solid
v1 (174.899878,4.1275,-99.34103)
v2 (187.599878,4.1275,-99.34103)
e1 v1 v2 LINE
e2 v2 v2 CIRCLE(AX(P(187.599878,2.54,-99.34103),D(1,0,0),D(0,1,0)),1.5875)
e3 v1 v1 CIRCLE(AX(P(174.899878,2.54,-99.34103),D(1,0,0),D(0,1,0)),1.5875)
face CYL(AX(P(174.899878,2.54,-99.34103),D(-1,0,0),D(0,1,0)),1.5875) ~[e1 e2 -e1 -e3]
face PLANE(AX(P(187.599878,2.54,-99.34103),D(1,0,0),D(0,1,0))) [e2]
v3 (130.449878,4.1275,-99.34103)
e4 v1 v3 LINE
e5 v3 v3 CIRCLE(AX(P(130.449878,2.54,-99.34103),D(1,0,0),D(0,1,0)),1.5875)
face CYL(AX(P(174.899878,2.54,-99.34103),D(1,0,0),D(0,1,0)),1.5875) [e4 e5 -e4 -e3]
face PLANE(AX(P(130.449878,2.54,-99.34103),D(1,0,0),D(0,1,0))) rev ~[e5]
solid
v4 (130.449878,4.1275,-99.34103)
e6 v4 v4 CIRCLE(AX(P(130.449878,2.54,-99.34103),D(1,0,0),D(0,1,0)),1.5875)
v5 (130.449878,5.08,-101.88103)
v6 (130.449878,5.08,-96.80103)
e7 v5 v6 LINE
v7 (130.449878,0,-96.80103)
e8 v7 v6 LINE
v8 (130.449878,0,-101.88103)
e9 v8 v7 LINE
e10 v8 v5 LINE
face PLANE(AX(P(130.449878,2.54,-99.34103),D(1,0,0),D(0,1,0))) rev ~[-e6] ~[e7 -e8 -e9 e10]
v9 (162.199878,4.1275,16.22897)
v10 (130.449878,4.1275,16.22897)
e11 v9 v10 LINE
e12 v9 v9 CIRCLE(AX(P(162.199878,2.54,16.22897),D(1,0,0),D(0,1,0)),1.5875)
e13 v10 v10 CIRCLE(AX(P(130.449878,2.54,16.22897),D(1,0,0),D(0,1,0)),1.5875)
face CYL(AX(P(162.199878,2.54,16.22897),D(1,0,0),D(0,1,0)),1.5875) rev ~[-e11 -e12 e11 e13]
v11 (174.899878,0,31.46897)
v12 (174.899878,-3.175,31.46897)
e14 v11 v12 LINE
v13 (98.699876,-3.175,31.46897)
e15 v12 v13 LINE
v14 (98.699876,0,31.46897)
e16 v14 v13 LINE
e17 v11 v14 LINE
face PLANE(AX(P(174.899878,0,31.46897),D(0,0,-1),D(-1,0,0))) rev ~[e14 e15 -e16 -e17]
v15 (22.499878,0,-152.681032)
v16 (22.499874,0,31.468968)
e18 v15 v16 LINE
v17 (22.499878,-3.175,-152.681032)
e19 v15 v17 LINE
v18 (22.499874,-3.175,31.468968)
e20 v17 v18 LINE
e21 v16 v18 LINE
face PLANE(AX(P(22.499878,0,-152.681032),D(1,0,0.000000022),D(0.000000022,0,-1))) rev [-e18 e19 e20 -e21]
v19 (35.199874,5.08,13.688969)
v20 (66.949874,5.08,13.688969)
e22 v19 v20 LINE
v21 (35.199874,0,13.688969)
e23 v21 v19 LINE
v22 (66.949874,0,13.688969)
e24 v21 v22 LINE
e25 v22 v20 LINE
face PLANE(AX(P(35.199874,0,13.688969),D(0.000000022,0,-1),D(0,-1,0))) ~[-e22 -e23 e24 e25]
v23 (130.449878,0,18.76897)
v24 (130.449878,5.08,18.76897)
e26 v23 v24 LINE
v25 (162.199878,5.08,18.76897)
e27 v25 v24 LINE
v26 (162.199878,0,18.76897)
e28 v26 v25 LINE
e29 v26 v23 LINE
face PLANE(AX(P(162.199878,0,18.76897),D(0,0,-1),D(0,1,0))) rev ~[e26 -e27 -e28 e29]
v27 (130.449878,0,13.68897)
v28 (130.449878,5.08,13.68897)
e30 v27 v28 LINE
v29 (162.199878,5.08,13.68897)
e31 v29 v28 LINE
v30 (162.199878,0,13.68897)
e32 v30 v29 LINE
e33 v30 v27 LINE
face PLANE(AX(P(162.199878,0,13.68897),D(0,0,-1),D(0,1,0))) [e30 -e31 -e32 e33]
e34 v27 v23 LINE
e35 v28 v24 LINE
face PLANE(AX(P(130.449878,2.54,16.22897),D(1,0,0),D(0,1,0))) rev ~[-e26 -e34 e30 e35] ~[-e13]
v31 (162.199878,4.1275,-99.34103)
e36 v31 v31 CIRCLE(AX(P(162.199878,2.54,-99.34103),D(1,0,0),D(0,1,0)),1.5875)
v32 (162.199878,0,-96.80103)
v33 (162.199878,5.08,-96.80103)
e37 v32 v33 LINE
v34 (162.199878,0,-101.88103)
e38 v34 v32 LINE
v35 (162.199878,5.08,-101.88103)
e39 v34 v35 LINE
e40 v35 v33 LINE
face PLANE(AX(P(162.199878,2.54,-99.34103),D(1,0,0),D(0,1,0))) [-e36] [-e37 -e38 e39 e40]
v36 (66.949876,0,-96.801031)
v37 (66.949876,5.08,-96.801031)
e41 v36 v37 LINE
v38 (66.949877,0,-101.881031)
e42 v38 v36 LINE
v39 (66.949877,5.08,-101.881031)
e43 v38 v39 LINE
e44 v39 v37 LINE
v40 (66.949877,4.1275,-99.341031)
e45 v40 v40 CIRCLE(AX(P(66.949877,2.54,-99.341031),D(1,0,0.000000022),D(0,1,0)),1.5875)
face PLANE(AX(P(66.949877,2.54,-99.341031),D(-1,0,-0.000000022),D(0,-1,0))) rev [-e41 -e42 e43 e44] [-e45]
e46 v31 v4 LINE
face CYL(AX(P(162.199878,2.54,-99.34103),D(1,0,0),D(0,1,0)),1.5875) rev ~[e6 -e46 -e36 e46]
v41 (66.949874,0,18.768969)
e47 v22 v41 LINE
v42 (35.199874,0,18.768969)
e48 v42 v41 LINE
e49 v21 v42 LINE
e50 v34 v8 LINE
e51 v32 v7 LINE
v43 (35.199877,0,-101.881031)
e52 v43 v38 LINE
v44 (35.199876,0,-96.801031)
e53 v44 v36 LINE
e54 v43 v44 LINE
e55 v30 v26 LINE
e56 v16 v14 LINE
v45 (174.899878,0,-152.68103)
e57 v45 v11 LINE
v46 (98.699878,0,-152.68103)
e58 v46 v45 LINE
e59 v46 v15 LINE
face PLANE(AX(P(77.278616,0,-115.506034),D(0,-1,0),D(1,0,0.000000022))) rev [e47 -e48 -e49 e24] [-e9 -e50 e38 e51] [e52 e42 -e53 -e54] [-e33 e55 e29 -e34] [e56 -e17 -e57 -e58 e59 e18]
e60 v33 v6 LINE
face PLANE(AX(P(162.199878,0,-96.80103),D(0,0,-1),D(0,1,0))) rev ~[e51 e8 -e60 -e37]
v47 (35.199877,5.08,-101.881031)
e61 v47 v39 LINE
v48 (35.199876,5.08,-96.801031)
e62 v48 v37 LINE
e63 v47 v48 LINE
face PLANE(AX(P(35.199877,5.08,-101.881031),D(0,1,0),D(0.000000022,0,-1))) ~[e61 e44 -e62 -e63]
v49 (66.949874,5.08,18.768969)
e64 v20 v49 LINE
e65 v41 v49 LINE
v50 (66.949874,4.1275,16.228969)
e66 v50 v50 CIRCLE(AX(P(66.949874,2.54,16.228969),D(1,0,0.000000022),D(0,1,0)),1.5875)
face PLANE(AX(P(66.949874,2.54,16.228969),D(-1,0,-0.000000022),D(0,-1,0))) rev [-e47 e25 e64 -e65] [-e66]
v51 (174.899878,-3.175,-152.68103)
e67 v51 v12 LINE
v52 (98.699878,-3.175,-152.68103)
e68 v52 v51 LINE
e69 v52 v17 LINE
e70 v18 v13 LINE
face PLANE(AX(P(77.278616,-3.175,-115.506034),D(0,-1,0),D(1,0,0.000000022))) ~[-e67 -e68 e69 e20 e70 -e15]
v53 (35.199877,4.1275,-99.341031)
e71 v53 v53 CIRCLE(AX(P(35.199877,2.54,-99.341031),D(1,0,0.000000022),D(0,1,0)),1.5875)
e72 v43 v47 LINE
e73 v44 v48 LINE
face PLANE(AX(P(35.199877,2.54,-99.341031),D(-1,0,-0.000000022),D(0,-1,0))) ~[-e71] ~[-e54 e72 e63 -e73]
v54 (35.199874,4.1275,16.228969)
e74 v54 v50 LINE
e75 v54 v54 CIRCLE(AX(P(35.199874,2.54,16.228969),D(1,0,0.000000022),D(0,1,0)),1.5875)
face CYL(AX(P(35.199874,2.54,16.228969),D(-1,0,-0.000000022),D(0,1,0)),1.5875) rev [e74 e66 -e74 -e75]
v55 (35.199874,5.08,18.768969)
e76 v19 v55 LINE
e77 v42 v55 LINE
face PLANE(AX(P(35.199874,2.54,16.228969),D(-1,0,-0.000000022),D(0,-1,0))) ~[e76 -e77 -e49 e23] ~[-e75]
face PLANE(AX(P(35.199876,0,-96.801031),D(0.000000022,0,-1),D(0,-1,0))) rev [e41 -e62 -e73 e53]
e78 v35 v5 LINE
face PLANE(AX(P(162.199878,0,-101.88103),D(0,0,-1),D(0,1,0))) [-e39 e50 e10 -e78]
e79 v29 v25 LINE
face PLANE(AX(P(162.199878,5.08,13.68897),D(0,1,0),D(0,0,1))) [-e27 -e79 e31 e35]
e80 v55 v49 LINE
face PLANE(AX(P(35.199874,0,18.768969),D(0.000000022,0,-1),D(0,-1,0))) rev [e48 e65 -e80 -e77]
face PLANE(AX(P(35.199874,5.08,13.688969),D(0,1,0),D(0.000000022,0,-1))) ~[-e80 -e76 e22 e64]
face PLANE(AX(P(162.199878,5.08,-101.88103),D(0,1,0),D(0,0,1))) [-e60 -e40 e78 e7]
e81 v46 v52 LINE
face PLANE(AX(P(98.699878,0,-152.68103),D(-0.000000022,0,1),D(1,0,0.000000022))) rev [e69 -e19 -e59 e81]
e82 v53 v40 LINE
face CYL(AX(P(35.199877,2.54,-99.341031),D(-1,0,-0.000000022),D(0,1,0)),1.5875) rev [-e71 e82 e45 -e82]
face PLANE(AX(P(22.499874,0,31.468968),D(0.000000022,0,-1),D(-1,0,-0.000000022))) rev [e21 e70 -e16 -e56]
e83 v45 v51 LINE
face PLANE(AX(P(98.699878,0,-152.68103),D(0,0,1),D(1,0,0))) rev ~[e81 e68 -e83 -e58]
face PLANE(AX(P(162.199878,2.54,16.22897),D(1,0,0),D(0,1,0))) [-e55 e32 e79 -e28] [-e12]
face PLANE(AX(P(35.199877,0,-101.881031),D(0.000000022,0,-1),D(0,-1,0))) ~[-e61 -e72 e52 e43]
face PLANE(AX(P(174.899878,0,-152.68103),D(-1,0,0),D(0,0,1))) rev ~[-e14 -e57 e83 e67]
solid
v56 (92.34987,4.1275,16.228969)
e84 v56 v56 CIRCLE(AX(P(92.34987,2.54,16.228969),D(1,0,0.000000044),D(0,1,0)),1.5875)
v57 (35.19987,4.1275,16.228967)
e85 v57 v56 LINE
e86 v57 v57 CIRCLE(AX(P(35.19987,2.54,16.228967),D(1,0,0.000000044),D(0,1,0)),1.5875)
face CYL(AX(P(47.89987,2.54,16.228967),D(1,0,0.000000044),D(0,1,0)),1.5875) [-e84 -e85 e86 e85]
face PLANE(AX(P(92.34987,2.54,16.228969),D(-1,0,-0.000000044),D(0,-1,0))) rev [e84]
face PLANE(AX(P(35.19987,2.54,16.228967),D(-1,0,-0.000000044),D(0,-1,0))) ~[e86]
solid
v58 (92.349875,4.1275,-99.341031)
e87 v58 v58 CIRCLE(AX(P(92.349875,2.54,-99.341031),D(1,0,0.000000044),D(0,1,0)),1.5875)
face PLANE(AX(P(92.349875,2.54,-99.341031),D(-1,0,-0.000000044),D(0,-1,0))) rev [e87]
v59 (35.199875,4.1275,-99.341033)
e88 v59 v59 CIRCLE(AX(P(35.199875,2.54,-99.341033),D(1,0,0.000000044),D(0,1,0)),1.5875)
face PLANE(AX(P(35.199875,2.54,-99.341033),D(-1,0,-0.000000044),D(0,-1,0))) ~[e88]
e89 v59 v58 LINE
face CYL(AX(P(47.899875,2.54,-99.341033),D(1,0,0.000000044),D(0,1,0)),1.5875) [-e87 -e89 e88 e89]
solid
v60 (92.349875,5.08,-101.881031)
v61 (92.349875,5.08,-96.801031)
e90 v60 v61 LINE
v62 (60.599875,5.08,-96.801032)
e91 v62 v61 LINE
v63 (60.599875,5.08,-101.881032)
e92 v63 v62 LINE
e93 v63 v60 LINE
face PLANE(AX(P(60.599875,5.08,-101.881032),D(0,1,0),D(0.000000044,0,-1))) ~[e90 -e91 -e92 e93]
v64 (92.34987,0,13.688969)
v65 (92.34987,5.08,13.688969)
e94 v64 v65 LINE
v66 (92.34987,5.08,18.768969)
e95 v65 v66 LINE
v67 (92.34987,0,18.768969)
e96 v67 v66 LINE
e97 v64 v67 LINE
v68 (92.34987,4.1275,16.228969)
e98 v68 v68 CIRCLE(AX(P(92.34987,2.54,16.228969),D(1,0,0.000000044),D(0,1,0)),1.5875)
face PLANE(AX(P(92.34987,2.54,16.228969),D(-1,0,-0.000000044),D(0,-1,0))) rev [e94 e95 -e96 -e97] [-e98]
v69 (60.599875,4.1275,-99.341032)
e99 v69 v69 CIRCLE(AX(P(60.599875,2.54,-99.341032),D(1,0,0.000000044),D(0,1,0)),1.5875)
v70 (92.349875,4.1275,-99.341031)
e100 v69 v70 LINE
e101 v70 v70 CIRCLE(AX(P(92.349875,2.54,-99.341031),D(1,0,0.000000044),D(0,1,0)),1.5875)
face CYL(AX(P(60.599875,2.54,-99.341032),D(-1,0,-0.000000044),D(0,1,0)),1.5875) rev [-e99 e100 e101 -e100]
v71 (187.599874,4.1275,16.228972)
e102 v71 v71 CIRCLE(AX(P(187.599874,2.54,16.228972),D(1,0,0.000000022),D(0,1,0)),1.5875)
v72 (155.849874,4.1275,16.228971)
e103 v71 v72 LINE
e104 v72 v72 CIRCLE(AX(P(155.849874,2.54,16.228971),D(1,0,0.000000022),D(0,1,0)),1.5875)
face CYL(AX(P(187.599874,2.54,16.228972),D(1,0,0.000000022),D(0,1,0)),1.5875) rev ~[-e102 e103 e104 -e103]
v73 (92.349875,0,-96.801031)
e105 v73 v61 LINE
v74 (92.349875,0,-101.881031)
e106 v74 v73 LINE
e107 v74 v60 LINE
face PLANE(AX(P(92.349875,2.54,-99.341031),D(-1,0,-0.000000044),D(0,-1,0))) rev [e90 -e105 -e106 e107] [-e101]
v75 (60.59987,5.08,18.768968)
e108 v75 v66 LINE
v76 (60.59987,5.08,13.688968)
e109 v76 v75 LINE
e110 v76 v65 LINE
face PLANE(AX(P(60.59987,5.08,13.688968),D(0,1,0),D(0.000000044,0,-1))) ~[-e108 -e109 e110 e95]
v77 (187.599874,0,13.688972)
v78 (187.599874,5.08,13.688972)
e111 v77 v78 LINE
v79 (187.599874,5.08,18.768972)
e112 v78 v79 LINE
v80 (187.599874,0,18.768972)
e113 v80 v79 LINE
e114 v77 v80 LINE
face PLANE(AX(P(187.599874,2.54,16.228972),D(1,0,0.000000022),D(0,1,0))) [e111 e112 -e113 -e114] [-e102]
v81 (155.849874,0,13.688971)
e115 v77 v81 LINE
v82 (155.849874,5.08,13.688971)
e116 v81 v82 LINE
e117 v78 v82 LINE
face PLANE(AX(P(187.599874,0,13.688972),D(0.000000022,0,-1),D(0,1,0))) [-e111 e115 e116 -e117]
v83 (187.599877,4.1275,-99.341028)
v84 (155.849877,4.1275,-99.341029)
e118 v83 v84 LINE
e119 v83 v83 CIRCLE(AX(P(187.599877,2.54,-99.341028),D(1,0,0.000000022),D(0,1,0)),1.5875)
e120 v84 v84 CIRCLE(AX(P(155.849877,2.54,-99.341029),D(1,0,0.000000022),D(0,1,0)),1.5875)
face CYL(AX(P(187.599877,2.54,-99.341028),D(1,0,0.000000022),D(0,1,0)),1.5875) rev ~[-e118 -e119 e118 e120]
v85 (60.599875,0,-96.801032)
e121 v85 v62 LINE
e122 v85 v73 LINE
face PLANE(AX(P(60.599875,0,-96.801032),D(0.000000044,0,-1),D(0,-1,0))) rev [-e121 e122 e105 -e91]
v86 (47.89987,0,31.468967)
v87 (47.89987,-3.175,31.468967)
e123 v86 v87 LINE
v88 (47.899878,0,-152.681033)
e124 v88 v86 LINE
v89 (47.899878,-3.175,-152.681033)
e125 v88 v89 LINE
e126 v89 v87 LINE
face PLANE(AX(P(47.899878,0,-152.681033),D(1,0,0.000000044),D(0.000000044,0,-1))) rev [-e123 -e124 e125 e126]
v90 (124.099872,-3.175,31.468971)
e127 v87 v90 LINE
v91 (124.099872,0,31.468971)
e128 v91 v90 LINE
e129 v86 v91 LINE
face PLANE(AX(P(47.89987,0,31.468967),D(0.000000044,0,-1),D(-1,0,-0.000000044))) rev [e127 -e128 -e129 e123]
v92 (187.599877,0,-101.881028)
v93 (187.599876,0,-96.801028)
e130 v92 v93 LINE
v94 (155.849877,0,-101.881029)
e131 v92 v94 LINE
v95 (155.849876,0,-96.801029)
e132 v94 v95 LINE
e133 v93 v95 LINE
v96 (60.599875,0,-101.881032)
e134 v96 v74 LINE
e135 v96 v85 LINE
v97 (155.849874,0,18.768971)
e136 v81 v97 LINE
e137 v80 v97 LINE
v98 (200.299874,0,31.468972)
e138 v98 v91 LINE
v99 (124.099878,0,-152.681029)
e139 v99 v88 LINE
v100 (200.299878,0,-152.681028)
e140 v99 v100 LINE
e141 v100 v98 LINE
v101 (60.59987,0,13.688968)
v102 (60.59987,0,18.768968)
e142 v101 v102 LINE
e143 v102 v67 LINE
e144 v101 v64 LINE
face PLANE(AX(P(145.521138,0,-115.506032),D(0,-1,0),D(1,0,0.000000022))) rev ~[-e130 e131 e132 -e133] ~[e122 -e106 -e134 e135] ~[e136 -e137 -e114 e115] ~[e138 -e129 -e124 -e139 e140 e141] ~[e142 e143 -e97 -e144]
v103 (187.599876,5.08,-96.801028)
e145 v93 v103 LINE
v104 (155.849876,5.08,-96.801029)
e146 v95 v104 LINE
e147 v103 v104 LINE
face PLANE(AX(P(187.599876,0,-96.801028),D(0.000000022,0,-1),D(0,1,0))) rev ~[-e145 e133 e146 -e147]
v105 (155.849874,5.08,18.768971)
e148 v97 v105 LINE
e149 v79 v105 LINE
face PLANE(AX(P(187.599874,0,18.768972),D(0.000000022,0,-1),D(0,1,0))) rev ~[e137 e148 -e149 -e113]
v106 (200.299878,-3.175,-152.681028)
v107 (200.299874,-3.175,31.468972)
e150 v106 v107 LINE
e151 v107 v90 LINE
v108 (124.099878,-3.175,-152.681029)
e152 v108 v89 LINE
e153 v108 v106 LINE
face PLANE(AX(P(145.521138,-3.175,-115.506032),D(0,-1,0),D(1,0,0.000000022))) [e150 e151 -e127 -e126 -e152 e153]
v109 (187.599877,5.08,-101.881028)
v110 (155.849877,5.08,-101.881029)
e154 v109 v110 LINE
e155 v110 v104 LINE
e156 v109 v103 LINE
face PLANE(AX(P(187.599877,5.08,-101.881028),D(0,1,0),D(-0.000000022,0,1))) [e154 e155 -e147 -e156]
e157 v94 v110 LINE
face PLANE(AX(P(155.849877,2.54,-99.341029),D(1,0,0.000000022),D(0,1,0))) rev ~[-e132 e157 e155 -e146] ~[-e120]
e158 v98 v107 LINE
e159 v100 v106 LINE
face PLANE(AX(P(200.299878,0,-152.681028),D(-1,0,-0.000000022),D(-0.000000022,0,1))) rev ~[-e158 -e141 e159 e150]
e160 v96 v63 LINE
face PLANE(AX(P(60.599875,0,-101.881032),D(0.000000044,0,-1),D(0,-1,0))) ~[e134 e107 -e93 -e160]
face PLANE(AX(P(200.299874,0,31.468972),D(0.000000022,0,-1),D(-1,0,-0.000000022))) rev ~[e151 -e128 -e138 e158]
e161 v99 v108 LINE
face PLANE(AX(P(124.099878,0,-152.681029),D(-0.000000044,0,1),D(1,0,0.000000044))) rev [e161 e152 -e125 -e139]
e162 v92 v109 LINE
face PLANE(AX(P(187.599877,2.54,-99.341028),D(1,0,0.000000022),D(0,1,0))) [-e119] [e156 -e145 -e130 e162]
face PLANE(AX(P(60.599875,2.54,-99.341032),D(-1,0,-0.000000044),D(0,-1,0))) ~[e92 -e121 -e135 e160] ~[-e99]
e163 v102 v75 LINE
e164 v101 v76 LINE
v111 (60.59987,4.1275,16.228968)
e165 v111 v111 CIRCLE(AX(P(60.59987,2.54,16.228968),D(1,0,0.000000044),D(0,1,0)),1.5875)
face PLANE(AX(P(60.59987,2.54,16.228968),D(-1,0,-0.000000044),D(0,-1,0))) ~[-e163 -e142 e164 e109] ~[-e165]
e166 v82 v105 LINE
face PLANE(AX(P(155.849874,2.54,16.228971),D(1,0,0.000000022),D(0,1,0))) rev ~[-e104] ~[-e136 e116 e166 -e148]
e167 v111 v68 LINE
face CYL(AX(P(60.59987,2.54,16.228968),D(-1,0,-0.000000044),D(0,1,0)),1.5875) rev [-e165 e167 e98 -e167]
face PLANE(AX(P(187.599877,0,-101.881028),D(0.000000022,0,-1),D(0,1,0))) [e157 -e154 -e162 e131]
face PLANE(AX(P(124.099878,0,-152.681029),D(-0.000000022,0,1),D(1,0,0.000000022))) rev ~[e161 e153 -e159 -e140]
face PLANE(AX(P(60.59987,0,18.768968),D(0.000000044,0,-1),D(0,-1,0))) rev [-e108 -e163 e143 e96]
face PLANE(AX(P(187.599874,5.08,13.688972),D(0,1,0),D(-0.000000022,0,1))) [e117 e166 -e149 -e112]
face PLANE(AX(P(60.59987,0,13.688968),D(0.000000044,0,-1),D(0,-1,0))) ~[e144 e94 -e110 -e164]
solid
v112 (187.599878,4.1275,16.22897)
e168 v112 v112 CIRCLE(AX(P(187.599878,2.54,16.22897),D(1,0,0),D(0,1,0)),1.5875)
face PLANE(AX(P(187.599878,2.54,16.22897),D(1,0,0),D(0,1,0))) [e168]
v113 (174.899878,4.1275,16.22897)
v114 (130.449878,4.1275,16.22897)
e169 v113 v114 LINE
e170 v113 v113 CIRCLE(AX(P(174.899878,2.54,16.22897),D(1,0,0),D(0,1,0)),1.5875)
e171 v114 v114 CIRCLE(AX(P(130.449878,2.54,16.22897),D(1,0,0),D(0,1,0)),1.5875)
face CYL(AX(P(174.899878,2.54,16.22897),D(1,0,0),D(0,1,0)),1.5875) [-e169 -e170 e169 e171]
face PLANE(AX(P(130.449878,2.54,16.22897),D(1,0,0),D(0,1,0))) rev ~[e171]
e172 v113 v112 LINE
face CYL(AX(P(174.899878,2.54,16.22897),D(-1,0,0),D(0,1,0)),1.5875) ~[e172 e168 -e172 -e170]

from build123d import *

# Parameters (mm, degrees)
F1_DEPTH      = 3.175
F3_START      = -12.7
F2_W          = 5.08
F2_H          = 5.08
F2_R          = 1.5875
F3_DEPTH      = 31.75
F5_DEPTH      = 44.45
F5_DEPTH_BACK = 12.7


# Not quite as in the source:
# - ends of sketch curves that miss each other by under 0.0002 mm in the source are joined
# - a feature names something its author has since deleted; it is built from what else it names


with BuildPart() as f1:
    # F0 (on Front) → F1 (new body)
    with BuildSketch(Plane.XZ):
        Polygon((98.6998776882, -152.6810299752), (128.3797776882, -152.6810299752), (128.3797776882, -78.3310389752), (98.6998768725, -78.3310389752), (98.6998769073, -81.5060299752), (125.2047776882, -81.5060299752), (125.2047776882, -149.5060299752), (98.6998776534, -149.5060299752), align=None)
        Polygon((174.8998776882, -152.6810299752), (174.8998776882, 31.4689700248), (98.6998756677, 31.4689700248), (98.6998768725, -78.3310389752), (128.3797776882, -78.3310389752), (128.3797776882, -152.6810299752), align=None)
        Polygon((125.2047776882, -81.5060299752), (98.6998769073, -81.5060299752), (98.6998776534, -149.5060299752), (125.2047776882, -149.5060299752), align=None)
    extrude(amount=F1_DEPTH)

    # F2 (on face) → F3 (join)
    with BuildSketch(Plane.YZ.offset(174.8998776882).offset(F3_START)):
        with Locations((2.54, 16.2289700248)):
            Rectangle(F2_W, F2_H)
        with Locations((2.54, 16.2289700248)):
            Circle(F2_R, mode=Mode.SUBTRACT)
        with Locations((2.54, -99.3410299752)):
            Rectangle(F2_W, F2_H)
        with Locations((2.54, -99.3410299752)):
            Circle(F2_R, mode=Mode.SUBTRACT)
    extrude(amount=-F3_DEPTH)

    # F4: F1 across face


with BuildPart() as f1_1:
    add(f1.part)
    add(f1.part.mirror(Plane(origin=(98.699876678, -1.5875, -60.6060299752), x_dir=(0, -1, 0), z_dir=(-1, 0, -1.1e-08))))


with BuildPart() as f5:
    # F2 (on face) → F5 (new body, two sides)
    with BuildSketch(Plane.YZ.offset(174.8998776882)) as f5_sk:
        with Locations((2.54, 16.2289700248)):
            Circle(F2_R)
    extrude(amount=-F5_DEPTH)
    extrude(f5_sk.sketch, amount=F5_DEPTH_BACK)


with BuildPart() as f5b:
    # F2 (on face) → F5, piece 2 (new body, two sides)
    with BuildSketch(Plane.YZ.offset(174.8998776882)) as f5_2_sk:
        with Locations((2.54, -99.3410299752)):
            Circle(F2_R)
    extrude(amount=-F5_DEPTH)
    extrude(f5_2_sk.sketch, amount=F5_DEPTH_BACK)


with BuildPart() as f7_1:
    # F7: instance of F1
    add(f1_1.part.mirror(Plane(origin=(111.3998739817, 2.54, 16.2289703035), x_dir=(0, 1, 0), z_dir=(1, 0, 2.19e-08))))


with BuildPart() as f7_2:
    # F7: instance of F5
    add(f5.part.mirror(Plane(origin=(111.3998739817, 2.54, 16.2289703035), x_dir=(0, 1, 0), z_dir=(1, 0, 2.19e-08))))


with BuildPart() as f7_3:
    # F7: instance of F5b
    add(f5b.part.mirror(Plane(origin=(111.3998739817, 2.54, 16.2289703035), x_dir=(0, 1, 0), z_dir=(1, 0, 2.19e-08))))


solid = Compound([f1_1.part, f5.part, f5b.part, f7_1.part, f7_2.part, f7_3.part])
